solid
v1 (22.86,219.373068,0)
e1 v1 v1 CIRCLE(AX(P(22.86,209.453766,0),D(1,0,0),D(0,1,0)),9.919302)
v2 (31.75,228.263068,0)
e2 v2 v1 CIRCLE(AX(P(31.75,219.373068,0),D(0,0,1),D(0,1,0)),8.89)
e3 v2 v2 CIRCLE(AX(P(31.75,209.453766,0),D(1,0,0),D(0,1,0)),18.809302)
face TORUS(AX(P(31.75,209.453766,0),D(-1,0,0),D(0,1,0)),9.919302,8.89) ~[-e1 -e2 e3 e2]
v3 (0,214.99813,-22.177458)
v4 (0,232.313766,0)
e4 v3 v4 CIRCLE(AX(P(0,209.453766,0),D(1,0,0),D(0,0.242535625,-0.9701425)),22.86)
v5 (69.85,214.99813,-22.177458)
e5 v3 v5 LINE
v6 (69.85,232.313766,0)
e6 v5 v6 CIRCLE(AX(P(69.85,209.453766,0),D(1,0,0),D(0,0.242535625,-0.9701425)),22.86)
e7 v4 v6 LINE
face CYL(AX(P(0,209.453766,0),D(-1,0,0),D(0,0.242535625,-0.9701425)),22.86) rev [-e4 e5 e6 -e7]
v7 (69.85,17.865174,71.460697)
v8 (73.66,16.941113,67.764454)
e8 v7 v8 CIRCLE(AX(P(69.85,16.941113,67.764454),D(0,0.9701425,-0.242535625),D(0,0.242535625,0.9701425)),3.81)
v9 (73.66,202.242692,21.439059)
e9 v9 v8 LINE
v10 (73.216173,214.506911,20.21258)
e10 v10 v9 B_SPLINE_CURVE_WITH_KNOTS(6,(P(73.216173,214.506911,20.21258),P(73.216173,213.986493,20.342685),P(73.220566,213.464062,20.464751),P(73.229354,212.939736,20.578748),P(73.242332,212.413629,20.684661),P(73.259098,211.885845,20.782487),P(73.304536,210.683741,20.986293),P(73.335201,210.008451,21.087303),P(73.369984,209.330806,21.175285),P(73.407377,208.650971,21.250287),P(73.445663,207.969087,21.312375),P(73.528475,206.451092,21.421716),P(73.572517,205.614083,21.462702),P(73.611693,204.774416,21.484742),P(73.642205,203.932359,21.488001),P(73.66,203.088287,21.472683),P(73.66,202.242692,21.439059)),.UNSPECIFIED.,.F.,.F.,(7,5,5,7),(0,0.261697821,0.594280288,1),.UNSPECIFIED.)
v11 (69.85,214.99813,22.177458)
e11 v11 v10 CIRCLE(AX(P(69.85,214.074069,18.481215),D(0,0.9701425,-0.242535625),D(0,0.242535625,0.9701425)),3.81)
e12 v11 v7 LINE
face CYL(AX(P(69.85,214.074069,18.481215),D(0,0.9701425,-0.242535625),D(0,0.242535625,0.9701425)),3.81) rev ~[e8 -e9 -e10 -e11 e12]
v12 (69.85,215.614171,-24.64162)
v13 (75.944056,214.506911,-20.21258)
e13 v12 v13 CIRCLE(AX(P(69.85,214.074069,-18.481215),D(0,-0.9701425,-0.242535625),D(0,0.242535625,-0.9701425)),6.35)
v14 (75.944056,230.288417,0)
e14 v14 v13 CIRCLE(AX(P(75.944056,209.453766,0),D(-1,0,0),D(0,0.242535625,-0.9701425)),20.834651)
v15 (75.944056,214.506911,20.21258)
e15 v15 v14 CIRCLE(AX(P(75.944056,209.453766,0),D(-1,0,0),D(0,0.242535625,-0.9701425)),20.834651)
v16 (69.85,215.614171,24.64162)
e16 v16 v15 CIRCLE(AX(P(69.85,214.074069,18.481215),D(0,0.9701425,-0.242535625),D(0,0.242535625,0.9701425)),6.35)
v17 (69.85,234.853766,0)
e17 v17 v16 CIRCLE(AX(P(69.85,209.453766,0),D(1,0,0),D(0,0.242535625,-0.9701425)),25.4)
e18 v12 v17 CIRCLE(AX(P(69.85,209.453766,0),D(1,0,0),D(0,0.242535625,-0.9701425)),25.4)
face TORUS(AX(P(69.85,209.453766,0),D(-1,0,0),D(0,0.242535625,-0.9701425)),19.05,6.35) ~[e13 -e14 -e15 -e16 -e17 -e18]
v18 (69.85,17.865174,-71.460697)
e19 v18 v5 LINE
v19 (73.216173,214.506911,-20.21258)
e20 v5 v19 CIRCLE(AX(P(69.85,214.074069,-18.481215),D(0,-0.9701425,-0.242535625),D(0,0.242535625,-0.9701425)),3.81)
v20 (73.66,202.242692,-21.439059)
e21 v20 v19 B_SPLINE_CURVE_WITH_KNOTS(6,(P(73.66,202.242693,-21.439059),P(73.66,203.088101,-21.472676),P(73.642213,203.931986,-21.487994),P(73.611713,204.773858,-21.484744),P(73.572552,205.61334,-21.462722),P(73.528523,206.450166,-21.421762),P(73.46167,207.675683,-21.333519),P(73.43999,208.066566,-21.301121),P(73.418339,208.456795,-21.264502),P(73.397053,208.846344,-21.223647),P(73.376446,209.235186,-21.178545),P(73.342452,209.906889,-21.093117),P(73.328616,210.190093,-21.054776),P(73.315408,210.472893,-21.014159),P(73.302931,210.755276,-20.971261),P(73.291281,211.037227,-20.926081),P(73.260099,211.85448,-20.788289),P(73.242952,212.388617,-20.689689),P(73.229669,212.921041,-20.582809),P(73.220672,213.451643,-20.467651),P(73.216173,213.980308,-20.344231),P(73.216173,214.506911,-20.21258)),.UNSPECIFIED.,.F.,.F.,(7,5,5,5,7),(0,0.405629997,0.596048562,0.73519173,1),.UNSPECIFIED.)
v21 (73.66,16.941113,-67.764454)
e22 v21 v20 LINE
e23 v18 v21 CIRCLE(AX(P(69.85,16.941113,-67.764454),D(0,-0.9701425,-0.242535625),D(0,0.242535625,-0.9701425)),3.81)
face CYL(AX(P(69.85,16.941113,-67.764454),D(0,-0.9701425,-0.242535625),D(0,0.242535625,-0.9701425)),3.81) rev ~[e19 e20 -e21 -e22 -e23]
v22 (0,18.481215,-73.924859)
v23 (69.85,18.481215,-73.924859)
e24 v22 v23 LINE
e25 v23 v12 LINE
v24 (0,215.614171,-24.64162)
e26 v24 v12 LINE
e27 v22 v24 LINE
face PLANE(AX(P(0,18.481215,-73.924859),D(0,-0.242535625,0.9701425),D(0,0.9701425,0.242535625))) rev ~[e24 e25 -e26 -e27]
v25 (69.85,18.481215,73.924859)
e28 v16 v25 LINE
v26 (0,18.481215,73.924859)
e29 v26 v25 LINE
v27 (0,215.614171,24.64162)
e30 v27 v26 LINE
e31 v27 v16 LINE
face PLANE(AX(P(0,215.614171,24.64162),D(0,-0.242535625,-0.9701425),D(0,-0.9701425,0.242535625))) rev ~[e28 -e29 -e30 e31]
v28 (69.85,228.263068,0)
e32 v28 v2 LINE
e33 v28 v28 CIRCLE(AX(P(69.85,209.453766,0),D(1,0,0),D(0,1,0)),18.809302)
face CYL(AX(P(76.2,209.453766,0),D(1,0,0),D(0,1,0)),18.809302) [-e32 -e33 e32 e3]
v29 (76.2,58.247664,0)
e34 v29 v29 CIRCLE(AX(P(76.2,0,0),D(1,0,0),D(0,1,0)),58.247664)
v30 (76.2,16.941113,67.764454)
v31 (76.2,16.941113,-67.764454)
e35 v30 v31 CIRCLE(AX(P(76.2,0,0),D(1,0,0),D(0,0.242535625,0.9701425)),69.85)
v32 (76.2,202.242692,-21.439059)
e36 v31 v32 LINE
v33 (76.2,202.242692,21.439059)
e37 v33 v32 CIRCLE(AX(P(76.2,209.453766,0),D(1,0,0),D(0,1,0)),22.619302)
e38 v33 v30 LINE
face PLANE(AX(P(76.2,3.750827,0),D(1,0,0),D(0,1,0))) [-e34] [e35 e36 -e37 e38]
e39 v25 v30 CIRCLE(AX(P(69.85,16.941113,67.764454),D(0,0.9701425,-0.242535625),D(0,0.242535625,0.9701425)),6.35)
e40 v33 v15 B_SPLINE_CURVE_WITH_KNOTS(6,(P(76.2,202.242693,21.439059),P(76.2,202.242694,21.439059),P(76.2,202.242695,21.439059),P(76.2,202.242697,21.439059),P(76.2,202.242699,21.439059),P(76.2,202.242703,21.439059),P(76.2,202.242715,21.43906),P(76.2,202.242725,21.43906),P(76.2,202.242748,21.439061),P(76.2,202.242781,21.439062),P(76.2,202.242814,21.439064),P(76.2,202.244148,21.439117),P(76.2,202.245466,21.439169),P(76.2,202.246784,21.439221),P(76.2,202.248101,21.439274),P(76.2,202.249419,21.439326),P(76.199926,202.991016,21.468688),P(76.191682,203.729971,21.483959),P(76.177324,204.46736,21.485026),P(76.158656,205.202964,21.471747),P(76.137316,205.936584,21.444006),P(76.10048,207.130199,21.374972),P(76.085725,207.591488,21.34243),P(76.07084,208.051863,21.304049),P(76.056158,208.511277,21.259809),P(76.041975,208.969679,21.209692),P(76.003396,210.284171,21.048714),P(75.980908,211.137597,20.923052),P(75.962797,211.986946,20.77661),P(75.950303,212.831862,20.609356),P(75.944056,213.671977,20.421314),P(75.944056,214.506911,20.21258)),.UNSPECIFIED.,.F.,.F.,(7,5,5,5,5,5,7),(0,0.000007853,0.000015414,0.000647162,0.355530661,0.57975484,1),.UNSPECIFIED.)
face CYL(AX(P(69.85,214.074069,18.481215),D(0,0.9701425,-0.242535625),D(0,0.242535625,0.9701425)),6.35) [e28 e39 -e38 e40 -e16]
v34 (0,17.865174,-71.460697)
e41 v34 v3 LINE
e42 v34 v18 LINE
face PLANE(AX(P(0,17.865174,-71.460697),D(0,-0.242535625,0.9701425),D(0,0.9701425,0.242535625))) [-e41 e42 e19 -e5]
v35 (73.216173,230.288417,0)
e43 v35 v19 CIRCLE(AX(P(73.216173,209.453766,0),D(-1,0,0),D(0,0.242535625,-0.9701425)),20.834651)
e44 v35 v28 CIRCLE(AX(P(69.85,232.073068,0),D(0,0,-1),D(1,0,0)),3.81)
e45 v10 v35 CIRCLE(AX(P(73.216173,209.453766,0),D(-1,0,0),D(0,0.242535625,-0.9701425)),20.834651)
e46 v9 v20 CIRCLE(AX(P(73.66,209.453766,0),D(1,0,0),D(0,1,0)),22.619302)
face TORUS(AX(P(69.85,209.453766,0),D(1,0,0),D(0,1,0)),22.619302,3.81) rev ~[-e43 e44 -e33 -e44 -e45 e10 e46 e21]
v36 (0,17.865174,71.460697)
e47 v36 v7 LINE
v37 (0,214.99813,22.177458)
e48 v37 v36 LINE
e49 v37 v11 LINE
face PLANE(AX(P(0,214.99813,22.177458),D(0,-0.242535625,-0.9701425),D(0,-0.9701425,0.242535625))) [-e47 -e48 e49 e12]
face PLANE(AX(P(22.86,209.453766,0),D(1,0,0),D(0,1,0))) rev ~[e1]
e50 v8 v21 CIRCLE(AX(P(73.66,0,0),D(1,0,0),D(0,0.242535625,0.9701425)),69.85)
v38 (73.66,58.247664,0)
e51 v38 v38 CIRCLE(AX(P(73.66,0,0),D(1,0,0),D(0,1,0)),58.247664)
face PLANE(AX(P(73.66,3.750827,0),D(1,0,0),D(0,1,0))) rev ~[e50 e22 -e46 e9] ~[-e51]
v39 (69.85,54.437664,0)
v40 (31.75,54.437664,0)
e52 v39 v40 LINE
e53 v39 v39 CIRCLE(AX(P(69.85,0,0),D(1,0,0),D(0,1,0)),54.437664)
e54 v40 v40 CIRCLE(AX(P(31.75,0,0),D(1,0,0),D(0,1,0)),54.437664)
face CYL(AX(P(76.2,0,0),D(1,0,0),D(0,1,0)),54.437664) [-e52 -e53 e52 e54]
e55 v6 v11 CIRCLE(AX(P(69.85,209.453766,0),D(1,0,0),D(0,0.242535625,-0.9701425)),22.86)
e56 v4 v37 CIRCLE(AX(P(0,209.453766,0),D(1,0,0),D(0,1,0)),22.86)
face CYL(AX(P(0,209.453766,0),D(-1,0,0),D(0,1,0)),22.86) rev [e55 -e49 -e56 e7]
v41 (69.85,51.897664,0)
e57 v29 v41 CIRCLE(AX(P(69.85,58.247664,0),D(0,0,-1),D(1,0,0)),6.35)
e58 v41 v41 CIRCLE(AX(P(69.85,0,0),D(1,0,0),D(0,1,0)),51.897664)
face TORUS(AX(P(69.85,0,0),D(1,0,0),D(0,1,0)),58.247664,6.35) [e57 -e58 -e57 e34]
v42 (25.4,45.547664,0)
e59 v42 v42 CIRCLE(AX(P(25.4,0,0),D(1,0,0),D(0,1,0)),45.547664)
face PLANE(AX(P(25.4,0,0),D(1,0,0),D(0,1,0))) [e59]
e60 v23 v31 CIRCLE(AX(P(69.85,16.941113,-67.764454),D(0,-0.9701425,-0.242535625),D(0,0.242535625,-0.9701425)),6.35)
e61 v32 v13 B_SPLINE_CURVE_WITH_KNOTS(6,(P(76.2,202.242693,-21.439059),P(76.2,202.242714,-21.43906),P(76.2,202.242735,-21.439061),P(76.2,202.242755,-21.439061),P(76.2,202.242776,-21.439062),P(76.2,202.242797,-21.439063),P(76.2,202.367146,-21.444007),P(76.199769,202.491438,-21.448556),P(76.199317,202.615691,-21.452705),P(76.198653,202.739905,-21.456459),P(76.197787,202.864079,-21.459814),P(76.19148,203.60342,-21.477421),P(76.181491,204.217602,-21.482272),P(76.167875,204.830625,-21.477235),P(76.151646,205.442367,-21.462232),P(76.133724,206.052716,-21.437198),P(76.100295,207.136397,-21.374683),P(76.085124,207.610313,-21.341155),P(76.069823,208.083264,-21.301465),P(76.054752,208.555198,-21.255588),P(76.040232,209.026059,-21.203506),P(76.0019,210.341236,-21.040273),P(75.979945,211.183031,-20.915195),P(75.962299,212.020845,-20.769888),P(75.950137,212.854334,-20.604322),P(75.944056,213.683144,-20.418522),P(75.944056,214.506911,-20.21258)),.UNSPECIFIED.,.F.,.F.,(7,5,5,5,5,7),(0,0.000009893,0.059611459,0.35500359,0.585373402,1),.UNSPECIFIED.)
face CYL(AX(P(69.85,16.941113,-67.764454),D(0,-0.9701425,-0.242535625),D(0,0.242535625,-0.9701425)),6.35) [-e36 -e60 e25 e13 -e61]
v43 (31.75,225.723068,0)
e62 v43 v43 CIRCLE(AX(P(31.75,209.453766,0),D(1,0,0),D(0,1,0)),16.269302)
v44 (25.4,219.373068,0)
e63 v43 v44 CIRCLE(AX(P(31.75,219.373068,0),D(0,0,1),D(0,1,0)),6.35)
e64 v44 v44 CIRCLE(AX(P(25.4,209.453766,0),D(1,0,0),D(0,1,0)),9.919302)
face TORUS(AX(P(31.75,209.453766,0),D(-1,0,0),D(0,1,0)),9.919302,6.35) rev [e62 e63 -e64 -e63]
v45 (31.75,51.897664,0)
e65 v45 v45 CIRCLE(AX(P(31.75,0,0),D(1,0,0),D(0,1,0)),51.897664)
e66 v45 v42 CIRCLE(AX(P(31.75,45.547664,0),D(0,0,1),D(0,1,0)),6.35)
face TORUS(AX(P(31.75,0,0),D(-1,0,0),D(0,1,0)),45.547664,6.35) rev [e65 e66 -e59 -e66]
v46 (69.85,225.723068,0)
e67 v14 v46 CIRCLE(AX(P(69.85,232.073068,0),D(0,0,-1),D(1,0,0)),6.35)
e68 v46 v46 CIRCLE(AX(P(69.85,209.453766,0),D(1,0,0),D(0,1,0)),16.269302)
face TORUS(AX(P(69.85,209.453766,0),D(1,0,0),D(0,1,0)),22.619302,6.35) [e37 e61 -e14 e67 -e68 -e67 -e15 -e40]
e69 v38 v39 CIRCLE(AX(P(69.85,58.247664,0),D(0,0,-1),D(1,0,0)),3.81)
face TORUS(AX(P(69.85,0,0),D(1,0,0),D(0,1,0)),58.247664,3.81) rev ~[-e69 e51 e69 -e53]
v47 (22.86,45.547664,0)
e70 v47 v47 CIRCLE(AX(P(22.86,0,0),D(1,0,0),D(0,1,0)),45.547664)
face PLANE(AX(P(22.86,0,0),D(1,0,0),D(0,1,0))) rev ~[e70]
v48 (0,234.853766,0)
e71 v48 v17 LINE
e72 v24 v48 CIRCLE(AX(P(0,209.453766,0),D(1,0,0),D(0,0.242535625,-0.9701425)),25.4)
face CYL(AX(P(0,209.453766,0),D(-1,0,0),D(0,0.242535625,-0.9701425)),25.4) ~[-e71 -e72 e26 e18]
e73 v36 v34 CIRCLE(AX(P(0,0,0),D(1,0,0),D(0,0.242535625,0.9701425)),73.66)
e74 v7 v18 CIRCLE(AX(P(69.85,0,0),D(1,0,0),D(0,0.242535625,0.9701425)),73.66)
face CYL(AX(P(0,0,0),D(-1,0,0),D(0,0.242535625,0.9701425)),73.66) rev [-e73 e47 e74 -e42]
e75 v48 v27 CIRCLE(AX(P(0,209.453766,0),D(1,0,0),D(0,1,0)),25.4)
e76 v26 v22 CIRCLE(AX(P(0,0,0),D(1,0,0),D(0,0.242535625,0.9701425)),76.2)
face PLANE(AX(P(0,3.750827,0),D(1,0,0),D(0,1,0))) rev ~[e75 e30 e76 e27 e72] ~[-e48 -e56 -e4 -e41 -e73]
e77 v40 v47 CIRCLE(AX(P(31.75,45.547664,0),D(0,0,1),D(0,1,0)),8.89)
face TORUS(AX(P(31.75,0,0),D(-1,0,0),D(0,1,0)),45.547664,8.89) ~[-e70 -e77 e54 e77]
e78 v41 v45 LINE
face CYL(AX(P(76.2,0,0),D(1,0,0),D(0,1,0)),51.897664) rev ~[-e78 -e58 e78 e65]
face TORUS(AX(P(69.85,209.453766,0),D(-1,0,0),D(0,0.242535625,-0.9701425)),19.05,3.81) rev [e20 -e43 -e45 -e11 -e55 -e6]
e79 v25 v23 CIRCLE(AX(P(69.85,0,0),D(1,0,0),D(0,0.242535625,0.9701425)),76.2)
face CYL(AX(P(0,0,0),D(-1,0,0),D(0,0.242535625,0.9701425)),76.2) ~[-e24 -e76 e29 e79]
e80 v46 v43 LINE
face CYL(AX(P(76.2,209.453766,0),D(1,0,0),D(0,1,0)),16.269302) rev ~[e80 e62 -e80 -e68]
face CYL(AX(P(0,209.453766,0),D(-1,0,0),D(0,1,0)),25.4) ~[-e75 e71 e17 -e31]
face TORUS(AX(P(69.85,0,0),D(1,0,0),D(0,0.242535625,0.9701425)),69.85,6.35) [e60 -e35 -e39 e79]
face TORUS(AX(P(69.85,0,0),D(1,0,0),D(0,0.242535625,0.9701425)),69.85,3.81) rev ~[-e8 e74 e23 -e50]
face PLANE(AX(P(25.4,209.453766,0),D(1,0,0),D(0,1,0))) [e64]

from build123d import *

# Parameters (mm, degrees)
F1_DEPTH     = 76.2
F2_R         = 51.8976641698
F2_R_2       = 16.2693021543
F3_DEPTH     = 50.8
F4_T5_DEPTH  = 203.2
F4_T7_DEPTH  = 203.2
F4_T10_ANGLE = 208.0724869359
F4_T12_ANGLE = 151.9275130641
F5_T         = -2.54


# Not quite as in the source:
# - a fillet or chamfer that OpenCascade refuses, or shapes differently, is made with other operations: its cross-section is extruded or revolved along the edge and cut away or added


with BuildPart() as f1:
    # F0 (on Right) → F1 (new body)
    with BuildSketch(Plane.YZ):
        with BuildLine():
            ThreePointArc((18.4812146278, -73.9248585111), (60.0612543768, -46.8944103565), (76.2, 0))
            ThreePointArc((76.2, 0), (60.0612543768, 46.8944103565), (18.4812146278, 73.9248585111))
            ThreePointArc((18.4812146278, 73.9248585111), (-76.2, 0), (18.4812146278, -73.9248585111))
        make_face()
        with BuildLine():
            ThreePointArc((18.4812146278, 73.9248585111), (60.0612543768, 46.8944103565), (76.2, 0))
            ThreePointArc((76.2, 0), (60.0612543768, -46.8944103565), (18.4812146278, -73.9248585111))
            Line((18.4812146278, -73.9248585111), (215.6141706573, -24.6416195037))
            ThreePointArc((215.6141706573, -24.6416195037), (184.0537657814, 0), (215.6141706573, 24.6416195037))
            Line((215.6141706573, 24.6416195037), (18.4812146278, 73.9248585111))
        make_face()
        with BuildLine():
            ThreePointArc((234.8537657814, 0), (229.474183907, 15.6314701188), (215.6141706573, 24.6416195037))
            ThreePointArc((215.6141706573, 24.6416195037), (184.0537657814, 0), (215.6141706573, -24.6416195037))
            ThreePointArc((215.6141706573, -24.6416195037), (229.474183907, -15.6314701188), (234.8537657814, 0))
        make_face()
    extrude(amount=F1_DEPTH)

    # F2 (on face) → F3 (cut)
    with BuildSketch(Plane.YZ.offset(76.2)):
        Circle(F2_R)
        with Locations((209.4537657814, 0)):
            Circle(F2_R_2)
    extrude(amount=-F3_DEPTH, mode=Mode.SUBTRACT)

    # F4: fillet of radius 6.35 on 8 edges, made by hand

    # F4_s1 → F4_t2 (revolve)
    with BuildSketch(Plane.XY):
        with BuildLine():
            ThreePointArc((31.75, 51.8976641698), (27.2598719395, 50.0377922304), (25.4, 45.5476641698))
            Line((25.4, 45.5476641698), (25.4, 51.8976641698))
            Line((25.4, 51.8976641698), (31.75, 51.8976641698))
        make_face()
    revolve(axis=Axis((25.4, 0, 0), (1, 0, 0)))

    # F4_s3 → F4_t4 (revolve)
    with BuildSketch(Plane.XY):
        with BuildLine():
            ThreePointArc((31.75, 225.7230679357), (27.2598719395, 223.8631959962), (25.4, 219.3730679357))
            Line((25.4, 219.3730679357), (25.4, 225.7230679357))
            Line((25.4, 225.7230679357), (31.75, 225.7230679357))
        make_face()
    revolve(axis=Axis((25.4, 209.4537657814, 0), (1, 0, 0)))

    # F4_s6 → F4_t5 (cut)
    with BuildSketch(Plane(origin=(0, 197.1329560295, -49.2832390074), x_dir=(1, 0, 0), z_dir=(0, -0.9701425001, 0.242535625))):
        with BuildLine():
            ThreePointArc((69.85, 76.2), (74.3401280605, 74.3401280605), (76.2, 69.85))
            Line((76.2, 69.85), (76.2, 76.2))
            Line((76.2, 76.2), (69.85, 76.2))
        make_face()
    extrude(amount=F4_T5_DEPTH, mode=Mode.SUBTRACT)

    # F4_s8 → F4_t7 (cut)
    with BuildSketch(Plane(origin=(0, 0, 0), x_dir=(1, 0, 0), z_dir=(0, 0.9701425001, 0.242535625))):
        with BuildLine():
            ThreePointArc((69.85, 76.2), (74.3401280605, 74.3401280605), (76.2, 69.85))
            Line((76.2, 69.85), (76.2, 76.2))
            Line((76.2, 76.2), (69.85, 76.2))
        make_face()
    extrude(amount=F4_T7_DEPTH, mode=Mode.SUBTRACT)

    # F4_s9 → F4_t10 (revolve, cut)
    with BuildSketch(Plane(origin=(0, 0, 0), x_dir=(1, 0, 0), z_dir=(0, 0.9701425001, -0.242535625))):
        with BuildLine():
            ThreePointArc((69.85, -76.2), (74.3401280605, -74.3401280605), (76.2, -69.85))
            Line((76.2, -69.85), (76.2, -76.2))
            Line((76.2, -76.2), (69.85, -76.2))
        make_face()
    revolve(axis=Axis((76.2, 0, 0), (1, 0, 0)), revolution_arc=F4_T10_ANGLE, mode=Mode.SUBTRACT)

    # F4_s11 → F4_t12 (revolve, cut)
    with BuildSketch(Plane(origin=(0, 197.1329560295, 49.2832390074), x_dir=(1, 0, 0), z_dir=(0, -0.9701425001, -0.242535625))):
        with BuildLine():
            ThreePointArc((76.2, -69.85), (74.3401280605, -74.3401280605), (69.85, -76.2))
            Line((69.85, -76.2), (76.2, -76.2))
            Line((76.2, -76.2), (76.2, -69.85))
        make_face()
    revolve(axis=Axis((76.2, 209.4537657814, 0), (1, 0, 0)), revolution_arc=F4_T12_ANGLE, mode=Mode.SUBTRACT)

    # F4_s13 → F4_t14 (revolve, cut)
    with BuildSketch(Plane.XY):
        with BuildLine():
            ThreePointArc((76.2, 58.2476641698), (74.3401280605, 53.7575361093), (69.85, 51.8976641698))
            Line((69.85, 51.8976641698), (76.2, 51.8976641698))
            Line((76.2, 51.8976641698), (76.2, 58.2476641698))
        make_face()
    revolve(axis=Axis((76.2, 0, 0), (1, 0, 0)), mode=Mode.SUBTRACT)

    # F4_s15 → F4_t16 (revolve, cut)
    with BuildSketch(Plane.XY):
        with BuildLine():
            ThreePointArc((76.2, 232.0730679357), (74.3401280605, 227.5829398752), (69.85, 225.7230679357))
            Line((69.85, 225.7230679357), (76.2, 225.7230679357))
            Line((76.2, 225.7230679357), (76.2, 232.0730679357))
        make_face()
    revolve(axis=Axis((76.2, 209.4537657814, 0), (1, 0, 0)), mode=Mode.SUBTRACT)

    # F5
    f5_openings = [f1.faces().sort_by_distance(p)[0] for p in [
        (0, 57.51924, 0),
    ]]
    offset(amount=F5_T, openings=f5_openings)


solid = f1.part
